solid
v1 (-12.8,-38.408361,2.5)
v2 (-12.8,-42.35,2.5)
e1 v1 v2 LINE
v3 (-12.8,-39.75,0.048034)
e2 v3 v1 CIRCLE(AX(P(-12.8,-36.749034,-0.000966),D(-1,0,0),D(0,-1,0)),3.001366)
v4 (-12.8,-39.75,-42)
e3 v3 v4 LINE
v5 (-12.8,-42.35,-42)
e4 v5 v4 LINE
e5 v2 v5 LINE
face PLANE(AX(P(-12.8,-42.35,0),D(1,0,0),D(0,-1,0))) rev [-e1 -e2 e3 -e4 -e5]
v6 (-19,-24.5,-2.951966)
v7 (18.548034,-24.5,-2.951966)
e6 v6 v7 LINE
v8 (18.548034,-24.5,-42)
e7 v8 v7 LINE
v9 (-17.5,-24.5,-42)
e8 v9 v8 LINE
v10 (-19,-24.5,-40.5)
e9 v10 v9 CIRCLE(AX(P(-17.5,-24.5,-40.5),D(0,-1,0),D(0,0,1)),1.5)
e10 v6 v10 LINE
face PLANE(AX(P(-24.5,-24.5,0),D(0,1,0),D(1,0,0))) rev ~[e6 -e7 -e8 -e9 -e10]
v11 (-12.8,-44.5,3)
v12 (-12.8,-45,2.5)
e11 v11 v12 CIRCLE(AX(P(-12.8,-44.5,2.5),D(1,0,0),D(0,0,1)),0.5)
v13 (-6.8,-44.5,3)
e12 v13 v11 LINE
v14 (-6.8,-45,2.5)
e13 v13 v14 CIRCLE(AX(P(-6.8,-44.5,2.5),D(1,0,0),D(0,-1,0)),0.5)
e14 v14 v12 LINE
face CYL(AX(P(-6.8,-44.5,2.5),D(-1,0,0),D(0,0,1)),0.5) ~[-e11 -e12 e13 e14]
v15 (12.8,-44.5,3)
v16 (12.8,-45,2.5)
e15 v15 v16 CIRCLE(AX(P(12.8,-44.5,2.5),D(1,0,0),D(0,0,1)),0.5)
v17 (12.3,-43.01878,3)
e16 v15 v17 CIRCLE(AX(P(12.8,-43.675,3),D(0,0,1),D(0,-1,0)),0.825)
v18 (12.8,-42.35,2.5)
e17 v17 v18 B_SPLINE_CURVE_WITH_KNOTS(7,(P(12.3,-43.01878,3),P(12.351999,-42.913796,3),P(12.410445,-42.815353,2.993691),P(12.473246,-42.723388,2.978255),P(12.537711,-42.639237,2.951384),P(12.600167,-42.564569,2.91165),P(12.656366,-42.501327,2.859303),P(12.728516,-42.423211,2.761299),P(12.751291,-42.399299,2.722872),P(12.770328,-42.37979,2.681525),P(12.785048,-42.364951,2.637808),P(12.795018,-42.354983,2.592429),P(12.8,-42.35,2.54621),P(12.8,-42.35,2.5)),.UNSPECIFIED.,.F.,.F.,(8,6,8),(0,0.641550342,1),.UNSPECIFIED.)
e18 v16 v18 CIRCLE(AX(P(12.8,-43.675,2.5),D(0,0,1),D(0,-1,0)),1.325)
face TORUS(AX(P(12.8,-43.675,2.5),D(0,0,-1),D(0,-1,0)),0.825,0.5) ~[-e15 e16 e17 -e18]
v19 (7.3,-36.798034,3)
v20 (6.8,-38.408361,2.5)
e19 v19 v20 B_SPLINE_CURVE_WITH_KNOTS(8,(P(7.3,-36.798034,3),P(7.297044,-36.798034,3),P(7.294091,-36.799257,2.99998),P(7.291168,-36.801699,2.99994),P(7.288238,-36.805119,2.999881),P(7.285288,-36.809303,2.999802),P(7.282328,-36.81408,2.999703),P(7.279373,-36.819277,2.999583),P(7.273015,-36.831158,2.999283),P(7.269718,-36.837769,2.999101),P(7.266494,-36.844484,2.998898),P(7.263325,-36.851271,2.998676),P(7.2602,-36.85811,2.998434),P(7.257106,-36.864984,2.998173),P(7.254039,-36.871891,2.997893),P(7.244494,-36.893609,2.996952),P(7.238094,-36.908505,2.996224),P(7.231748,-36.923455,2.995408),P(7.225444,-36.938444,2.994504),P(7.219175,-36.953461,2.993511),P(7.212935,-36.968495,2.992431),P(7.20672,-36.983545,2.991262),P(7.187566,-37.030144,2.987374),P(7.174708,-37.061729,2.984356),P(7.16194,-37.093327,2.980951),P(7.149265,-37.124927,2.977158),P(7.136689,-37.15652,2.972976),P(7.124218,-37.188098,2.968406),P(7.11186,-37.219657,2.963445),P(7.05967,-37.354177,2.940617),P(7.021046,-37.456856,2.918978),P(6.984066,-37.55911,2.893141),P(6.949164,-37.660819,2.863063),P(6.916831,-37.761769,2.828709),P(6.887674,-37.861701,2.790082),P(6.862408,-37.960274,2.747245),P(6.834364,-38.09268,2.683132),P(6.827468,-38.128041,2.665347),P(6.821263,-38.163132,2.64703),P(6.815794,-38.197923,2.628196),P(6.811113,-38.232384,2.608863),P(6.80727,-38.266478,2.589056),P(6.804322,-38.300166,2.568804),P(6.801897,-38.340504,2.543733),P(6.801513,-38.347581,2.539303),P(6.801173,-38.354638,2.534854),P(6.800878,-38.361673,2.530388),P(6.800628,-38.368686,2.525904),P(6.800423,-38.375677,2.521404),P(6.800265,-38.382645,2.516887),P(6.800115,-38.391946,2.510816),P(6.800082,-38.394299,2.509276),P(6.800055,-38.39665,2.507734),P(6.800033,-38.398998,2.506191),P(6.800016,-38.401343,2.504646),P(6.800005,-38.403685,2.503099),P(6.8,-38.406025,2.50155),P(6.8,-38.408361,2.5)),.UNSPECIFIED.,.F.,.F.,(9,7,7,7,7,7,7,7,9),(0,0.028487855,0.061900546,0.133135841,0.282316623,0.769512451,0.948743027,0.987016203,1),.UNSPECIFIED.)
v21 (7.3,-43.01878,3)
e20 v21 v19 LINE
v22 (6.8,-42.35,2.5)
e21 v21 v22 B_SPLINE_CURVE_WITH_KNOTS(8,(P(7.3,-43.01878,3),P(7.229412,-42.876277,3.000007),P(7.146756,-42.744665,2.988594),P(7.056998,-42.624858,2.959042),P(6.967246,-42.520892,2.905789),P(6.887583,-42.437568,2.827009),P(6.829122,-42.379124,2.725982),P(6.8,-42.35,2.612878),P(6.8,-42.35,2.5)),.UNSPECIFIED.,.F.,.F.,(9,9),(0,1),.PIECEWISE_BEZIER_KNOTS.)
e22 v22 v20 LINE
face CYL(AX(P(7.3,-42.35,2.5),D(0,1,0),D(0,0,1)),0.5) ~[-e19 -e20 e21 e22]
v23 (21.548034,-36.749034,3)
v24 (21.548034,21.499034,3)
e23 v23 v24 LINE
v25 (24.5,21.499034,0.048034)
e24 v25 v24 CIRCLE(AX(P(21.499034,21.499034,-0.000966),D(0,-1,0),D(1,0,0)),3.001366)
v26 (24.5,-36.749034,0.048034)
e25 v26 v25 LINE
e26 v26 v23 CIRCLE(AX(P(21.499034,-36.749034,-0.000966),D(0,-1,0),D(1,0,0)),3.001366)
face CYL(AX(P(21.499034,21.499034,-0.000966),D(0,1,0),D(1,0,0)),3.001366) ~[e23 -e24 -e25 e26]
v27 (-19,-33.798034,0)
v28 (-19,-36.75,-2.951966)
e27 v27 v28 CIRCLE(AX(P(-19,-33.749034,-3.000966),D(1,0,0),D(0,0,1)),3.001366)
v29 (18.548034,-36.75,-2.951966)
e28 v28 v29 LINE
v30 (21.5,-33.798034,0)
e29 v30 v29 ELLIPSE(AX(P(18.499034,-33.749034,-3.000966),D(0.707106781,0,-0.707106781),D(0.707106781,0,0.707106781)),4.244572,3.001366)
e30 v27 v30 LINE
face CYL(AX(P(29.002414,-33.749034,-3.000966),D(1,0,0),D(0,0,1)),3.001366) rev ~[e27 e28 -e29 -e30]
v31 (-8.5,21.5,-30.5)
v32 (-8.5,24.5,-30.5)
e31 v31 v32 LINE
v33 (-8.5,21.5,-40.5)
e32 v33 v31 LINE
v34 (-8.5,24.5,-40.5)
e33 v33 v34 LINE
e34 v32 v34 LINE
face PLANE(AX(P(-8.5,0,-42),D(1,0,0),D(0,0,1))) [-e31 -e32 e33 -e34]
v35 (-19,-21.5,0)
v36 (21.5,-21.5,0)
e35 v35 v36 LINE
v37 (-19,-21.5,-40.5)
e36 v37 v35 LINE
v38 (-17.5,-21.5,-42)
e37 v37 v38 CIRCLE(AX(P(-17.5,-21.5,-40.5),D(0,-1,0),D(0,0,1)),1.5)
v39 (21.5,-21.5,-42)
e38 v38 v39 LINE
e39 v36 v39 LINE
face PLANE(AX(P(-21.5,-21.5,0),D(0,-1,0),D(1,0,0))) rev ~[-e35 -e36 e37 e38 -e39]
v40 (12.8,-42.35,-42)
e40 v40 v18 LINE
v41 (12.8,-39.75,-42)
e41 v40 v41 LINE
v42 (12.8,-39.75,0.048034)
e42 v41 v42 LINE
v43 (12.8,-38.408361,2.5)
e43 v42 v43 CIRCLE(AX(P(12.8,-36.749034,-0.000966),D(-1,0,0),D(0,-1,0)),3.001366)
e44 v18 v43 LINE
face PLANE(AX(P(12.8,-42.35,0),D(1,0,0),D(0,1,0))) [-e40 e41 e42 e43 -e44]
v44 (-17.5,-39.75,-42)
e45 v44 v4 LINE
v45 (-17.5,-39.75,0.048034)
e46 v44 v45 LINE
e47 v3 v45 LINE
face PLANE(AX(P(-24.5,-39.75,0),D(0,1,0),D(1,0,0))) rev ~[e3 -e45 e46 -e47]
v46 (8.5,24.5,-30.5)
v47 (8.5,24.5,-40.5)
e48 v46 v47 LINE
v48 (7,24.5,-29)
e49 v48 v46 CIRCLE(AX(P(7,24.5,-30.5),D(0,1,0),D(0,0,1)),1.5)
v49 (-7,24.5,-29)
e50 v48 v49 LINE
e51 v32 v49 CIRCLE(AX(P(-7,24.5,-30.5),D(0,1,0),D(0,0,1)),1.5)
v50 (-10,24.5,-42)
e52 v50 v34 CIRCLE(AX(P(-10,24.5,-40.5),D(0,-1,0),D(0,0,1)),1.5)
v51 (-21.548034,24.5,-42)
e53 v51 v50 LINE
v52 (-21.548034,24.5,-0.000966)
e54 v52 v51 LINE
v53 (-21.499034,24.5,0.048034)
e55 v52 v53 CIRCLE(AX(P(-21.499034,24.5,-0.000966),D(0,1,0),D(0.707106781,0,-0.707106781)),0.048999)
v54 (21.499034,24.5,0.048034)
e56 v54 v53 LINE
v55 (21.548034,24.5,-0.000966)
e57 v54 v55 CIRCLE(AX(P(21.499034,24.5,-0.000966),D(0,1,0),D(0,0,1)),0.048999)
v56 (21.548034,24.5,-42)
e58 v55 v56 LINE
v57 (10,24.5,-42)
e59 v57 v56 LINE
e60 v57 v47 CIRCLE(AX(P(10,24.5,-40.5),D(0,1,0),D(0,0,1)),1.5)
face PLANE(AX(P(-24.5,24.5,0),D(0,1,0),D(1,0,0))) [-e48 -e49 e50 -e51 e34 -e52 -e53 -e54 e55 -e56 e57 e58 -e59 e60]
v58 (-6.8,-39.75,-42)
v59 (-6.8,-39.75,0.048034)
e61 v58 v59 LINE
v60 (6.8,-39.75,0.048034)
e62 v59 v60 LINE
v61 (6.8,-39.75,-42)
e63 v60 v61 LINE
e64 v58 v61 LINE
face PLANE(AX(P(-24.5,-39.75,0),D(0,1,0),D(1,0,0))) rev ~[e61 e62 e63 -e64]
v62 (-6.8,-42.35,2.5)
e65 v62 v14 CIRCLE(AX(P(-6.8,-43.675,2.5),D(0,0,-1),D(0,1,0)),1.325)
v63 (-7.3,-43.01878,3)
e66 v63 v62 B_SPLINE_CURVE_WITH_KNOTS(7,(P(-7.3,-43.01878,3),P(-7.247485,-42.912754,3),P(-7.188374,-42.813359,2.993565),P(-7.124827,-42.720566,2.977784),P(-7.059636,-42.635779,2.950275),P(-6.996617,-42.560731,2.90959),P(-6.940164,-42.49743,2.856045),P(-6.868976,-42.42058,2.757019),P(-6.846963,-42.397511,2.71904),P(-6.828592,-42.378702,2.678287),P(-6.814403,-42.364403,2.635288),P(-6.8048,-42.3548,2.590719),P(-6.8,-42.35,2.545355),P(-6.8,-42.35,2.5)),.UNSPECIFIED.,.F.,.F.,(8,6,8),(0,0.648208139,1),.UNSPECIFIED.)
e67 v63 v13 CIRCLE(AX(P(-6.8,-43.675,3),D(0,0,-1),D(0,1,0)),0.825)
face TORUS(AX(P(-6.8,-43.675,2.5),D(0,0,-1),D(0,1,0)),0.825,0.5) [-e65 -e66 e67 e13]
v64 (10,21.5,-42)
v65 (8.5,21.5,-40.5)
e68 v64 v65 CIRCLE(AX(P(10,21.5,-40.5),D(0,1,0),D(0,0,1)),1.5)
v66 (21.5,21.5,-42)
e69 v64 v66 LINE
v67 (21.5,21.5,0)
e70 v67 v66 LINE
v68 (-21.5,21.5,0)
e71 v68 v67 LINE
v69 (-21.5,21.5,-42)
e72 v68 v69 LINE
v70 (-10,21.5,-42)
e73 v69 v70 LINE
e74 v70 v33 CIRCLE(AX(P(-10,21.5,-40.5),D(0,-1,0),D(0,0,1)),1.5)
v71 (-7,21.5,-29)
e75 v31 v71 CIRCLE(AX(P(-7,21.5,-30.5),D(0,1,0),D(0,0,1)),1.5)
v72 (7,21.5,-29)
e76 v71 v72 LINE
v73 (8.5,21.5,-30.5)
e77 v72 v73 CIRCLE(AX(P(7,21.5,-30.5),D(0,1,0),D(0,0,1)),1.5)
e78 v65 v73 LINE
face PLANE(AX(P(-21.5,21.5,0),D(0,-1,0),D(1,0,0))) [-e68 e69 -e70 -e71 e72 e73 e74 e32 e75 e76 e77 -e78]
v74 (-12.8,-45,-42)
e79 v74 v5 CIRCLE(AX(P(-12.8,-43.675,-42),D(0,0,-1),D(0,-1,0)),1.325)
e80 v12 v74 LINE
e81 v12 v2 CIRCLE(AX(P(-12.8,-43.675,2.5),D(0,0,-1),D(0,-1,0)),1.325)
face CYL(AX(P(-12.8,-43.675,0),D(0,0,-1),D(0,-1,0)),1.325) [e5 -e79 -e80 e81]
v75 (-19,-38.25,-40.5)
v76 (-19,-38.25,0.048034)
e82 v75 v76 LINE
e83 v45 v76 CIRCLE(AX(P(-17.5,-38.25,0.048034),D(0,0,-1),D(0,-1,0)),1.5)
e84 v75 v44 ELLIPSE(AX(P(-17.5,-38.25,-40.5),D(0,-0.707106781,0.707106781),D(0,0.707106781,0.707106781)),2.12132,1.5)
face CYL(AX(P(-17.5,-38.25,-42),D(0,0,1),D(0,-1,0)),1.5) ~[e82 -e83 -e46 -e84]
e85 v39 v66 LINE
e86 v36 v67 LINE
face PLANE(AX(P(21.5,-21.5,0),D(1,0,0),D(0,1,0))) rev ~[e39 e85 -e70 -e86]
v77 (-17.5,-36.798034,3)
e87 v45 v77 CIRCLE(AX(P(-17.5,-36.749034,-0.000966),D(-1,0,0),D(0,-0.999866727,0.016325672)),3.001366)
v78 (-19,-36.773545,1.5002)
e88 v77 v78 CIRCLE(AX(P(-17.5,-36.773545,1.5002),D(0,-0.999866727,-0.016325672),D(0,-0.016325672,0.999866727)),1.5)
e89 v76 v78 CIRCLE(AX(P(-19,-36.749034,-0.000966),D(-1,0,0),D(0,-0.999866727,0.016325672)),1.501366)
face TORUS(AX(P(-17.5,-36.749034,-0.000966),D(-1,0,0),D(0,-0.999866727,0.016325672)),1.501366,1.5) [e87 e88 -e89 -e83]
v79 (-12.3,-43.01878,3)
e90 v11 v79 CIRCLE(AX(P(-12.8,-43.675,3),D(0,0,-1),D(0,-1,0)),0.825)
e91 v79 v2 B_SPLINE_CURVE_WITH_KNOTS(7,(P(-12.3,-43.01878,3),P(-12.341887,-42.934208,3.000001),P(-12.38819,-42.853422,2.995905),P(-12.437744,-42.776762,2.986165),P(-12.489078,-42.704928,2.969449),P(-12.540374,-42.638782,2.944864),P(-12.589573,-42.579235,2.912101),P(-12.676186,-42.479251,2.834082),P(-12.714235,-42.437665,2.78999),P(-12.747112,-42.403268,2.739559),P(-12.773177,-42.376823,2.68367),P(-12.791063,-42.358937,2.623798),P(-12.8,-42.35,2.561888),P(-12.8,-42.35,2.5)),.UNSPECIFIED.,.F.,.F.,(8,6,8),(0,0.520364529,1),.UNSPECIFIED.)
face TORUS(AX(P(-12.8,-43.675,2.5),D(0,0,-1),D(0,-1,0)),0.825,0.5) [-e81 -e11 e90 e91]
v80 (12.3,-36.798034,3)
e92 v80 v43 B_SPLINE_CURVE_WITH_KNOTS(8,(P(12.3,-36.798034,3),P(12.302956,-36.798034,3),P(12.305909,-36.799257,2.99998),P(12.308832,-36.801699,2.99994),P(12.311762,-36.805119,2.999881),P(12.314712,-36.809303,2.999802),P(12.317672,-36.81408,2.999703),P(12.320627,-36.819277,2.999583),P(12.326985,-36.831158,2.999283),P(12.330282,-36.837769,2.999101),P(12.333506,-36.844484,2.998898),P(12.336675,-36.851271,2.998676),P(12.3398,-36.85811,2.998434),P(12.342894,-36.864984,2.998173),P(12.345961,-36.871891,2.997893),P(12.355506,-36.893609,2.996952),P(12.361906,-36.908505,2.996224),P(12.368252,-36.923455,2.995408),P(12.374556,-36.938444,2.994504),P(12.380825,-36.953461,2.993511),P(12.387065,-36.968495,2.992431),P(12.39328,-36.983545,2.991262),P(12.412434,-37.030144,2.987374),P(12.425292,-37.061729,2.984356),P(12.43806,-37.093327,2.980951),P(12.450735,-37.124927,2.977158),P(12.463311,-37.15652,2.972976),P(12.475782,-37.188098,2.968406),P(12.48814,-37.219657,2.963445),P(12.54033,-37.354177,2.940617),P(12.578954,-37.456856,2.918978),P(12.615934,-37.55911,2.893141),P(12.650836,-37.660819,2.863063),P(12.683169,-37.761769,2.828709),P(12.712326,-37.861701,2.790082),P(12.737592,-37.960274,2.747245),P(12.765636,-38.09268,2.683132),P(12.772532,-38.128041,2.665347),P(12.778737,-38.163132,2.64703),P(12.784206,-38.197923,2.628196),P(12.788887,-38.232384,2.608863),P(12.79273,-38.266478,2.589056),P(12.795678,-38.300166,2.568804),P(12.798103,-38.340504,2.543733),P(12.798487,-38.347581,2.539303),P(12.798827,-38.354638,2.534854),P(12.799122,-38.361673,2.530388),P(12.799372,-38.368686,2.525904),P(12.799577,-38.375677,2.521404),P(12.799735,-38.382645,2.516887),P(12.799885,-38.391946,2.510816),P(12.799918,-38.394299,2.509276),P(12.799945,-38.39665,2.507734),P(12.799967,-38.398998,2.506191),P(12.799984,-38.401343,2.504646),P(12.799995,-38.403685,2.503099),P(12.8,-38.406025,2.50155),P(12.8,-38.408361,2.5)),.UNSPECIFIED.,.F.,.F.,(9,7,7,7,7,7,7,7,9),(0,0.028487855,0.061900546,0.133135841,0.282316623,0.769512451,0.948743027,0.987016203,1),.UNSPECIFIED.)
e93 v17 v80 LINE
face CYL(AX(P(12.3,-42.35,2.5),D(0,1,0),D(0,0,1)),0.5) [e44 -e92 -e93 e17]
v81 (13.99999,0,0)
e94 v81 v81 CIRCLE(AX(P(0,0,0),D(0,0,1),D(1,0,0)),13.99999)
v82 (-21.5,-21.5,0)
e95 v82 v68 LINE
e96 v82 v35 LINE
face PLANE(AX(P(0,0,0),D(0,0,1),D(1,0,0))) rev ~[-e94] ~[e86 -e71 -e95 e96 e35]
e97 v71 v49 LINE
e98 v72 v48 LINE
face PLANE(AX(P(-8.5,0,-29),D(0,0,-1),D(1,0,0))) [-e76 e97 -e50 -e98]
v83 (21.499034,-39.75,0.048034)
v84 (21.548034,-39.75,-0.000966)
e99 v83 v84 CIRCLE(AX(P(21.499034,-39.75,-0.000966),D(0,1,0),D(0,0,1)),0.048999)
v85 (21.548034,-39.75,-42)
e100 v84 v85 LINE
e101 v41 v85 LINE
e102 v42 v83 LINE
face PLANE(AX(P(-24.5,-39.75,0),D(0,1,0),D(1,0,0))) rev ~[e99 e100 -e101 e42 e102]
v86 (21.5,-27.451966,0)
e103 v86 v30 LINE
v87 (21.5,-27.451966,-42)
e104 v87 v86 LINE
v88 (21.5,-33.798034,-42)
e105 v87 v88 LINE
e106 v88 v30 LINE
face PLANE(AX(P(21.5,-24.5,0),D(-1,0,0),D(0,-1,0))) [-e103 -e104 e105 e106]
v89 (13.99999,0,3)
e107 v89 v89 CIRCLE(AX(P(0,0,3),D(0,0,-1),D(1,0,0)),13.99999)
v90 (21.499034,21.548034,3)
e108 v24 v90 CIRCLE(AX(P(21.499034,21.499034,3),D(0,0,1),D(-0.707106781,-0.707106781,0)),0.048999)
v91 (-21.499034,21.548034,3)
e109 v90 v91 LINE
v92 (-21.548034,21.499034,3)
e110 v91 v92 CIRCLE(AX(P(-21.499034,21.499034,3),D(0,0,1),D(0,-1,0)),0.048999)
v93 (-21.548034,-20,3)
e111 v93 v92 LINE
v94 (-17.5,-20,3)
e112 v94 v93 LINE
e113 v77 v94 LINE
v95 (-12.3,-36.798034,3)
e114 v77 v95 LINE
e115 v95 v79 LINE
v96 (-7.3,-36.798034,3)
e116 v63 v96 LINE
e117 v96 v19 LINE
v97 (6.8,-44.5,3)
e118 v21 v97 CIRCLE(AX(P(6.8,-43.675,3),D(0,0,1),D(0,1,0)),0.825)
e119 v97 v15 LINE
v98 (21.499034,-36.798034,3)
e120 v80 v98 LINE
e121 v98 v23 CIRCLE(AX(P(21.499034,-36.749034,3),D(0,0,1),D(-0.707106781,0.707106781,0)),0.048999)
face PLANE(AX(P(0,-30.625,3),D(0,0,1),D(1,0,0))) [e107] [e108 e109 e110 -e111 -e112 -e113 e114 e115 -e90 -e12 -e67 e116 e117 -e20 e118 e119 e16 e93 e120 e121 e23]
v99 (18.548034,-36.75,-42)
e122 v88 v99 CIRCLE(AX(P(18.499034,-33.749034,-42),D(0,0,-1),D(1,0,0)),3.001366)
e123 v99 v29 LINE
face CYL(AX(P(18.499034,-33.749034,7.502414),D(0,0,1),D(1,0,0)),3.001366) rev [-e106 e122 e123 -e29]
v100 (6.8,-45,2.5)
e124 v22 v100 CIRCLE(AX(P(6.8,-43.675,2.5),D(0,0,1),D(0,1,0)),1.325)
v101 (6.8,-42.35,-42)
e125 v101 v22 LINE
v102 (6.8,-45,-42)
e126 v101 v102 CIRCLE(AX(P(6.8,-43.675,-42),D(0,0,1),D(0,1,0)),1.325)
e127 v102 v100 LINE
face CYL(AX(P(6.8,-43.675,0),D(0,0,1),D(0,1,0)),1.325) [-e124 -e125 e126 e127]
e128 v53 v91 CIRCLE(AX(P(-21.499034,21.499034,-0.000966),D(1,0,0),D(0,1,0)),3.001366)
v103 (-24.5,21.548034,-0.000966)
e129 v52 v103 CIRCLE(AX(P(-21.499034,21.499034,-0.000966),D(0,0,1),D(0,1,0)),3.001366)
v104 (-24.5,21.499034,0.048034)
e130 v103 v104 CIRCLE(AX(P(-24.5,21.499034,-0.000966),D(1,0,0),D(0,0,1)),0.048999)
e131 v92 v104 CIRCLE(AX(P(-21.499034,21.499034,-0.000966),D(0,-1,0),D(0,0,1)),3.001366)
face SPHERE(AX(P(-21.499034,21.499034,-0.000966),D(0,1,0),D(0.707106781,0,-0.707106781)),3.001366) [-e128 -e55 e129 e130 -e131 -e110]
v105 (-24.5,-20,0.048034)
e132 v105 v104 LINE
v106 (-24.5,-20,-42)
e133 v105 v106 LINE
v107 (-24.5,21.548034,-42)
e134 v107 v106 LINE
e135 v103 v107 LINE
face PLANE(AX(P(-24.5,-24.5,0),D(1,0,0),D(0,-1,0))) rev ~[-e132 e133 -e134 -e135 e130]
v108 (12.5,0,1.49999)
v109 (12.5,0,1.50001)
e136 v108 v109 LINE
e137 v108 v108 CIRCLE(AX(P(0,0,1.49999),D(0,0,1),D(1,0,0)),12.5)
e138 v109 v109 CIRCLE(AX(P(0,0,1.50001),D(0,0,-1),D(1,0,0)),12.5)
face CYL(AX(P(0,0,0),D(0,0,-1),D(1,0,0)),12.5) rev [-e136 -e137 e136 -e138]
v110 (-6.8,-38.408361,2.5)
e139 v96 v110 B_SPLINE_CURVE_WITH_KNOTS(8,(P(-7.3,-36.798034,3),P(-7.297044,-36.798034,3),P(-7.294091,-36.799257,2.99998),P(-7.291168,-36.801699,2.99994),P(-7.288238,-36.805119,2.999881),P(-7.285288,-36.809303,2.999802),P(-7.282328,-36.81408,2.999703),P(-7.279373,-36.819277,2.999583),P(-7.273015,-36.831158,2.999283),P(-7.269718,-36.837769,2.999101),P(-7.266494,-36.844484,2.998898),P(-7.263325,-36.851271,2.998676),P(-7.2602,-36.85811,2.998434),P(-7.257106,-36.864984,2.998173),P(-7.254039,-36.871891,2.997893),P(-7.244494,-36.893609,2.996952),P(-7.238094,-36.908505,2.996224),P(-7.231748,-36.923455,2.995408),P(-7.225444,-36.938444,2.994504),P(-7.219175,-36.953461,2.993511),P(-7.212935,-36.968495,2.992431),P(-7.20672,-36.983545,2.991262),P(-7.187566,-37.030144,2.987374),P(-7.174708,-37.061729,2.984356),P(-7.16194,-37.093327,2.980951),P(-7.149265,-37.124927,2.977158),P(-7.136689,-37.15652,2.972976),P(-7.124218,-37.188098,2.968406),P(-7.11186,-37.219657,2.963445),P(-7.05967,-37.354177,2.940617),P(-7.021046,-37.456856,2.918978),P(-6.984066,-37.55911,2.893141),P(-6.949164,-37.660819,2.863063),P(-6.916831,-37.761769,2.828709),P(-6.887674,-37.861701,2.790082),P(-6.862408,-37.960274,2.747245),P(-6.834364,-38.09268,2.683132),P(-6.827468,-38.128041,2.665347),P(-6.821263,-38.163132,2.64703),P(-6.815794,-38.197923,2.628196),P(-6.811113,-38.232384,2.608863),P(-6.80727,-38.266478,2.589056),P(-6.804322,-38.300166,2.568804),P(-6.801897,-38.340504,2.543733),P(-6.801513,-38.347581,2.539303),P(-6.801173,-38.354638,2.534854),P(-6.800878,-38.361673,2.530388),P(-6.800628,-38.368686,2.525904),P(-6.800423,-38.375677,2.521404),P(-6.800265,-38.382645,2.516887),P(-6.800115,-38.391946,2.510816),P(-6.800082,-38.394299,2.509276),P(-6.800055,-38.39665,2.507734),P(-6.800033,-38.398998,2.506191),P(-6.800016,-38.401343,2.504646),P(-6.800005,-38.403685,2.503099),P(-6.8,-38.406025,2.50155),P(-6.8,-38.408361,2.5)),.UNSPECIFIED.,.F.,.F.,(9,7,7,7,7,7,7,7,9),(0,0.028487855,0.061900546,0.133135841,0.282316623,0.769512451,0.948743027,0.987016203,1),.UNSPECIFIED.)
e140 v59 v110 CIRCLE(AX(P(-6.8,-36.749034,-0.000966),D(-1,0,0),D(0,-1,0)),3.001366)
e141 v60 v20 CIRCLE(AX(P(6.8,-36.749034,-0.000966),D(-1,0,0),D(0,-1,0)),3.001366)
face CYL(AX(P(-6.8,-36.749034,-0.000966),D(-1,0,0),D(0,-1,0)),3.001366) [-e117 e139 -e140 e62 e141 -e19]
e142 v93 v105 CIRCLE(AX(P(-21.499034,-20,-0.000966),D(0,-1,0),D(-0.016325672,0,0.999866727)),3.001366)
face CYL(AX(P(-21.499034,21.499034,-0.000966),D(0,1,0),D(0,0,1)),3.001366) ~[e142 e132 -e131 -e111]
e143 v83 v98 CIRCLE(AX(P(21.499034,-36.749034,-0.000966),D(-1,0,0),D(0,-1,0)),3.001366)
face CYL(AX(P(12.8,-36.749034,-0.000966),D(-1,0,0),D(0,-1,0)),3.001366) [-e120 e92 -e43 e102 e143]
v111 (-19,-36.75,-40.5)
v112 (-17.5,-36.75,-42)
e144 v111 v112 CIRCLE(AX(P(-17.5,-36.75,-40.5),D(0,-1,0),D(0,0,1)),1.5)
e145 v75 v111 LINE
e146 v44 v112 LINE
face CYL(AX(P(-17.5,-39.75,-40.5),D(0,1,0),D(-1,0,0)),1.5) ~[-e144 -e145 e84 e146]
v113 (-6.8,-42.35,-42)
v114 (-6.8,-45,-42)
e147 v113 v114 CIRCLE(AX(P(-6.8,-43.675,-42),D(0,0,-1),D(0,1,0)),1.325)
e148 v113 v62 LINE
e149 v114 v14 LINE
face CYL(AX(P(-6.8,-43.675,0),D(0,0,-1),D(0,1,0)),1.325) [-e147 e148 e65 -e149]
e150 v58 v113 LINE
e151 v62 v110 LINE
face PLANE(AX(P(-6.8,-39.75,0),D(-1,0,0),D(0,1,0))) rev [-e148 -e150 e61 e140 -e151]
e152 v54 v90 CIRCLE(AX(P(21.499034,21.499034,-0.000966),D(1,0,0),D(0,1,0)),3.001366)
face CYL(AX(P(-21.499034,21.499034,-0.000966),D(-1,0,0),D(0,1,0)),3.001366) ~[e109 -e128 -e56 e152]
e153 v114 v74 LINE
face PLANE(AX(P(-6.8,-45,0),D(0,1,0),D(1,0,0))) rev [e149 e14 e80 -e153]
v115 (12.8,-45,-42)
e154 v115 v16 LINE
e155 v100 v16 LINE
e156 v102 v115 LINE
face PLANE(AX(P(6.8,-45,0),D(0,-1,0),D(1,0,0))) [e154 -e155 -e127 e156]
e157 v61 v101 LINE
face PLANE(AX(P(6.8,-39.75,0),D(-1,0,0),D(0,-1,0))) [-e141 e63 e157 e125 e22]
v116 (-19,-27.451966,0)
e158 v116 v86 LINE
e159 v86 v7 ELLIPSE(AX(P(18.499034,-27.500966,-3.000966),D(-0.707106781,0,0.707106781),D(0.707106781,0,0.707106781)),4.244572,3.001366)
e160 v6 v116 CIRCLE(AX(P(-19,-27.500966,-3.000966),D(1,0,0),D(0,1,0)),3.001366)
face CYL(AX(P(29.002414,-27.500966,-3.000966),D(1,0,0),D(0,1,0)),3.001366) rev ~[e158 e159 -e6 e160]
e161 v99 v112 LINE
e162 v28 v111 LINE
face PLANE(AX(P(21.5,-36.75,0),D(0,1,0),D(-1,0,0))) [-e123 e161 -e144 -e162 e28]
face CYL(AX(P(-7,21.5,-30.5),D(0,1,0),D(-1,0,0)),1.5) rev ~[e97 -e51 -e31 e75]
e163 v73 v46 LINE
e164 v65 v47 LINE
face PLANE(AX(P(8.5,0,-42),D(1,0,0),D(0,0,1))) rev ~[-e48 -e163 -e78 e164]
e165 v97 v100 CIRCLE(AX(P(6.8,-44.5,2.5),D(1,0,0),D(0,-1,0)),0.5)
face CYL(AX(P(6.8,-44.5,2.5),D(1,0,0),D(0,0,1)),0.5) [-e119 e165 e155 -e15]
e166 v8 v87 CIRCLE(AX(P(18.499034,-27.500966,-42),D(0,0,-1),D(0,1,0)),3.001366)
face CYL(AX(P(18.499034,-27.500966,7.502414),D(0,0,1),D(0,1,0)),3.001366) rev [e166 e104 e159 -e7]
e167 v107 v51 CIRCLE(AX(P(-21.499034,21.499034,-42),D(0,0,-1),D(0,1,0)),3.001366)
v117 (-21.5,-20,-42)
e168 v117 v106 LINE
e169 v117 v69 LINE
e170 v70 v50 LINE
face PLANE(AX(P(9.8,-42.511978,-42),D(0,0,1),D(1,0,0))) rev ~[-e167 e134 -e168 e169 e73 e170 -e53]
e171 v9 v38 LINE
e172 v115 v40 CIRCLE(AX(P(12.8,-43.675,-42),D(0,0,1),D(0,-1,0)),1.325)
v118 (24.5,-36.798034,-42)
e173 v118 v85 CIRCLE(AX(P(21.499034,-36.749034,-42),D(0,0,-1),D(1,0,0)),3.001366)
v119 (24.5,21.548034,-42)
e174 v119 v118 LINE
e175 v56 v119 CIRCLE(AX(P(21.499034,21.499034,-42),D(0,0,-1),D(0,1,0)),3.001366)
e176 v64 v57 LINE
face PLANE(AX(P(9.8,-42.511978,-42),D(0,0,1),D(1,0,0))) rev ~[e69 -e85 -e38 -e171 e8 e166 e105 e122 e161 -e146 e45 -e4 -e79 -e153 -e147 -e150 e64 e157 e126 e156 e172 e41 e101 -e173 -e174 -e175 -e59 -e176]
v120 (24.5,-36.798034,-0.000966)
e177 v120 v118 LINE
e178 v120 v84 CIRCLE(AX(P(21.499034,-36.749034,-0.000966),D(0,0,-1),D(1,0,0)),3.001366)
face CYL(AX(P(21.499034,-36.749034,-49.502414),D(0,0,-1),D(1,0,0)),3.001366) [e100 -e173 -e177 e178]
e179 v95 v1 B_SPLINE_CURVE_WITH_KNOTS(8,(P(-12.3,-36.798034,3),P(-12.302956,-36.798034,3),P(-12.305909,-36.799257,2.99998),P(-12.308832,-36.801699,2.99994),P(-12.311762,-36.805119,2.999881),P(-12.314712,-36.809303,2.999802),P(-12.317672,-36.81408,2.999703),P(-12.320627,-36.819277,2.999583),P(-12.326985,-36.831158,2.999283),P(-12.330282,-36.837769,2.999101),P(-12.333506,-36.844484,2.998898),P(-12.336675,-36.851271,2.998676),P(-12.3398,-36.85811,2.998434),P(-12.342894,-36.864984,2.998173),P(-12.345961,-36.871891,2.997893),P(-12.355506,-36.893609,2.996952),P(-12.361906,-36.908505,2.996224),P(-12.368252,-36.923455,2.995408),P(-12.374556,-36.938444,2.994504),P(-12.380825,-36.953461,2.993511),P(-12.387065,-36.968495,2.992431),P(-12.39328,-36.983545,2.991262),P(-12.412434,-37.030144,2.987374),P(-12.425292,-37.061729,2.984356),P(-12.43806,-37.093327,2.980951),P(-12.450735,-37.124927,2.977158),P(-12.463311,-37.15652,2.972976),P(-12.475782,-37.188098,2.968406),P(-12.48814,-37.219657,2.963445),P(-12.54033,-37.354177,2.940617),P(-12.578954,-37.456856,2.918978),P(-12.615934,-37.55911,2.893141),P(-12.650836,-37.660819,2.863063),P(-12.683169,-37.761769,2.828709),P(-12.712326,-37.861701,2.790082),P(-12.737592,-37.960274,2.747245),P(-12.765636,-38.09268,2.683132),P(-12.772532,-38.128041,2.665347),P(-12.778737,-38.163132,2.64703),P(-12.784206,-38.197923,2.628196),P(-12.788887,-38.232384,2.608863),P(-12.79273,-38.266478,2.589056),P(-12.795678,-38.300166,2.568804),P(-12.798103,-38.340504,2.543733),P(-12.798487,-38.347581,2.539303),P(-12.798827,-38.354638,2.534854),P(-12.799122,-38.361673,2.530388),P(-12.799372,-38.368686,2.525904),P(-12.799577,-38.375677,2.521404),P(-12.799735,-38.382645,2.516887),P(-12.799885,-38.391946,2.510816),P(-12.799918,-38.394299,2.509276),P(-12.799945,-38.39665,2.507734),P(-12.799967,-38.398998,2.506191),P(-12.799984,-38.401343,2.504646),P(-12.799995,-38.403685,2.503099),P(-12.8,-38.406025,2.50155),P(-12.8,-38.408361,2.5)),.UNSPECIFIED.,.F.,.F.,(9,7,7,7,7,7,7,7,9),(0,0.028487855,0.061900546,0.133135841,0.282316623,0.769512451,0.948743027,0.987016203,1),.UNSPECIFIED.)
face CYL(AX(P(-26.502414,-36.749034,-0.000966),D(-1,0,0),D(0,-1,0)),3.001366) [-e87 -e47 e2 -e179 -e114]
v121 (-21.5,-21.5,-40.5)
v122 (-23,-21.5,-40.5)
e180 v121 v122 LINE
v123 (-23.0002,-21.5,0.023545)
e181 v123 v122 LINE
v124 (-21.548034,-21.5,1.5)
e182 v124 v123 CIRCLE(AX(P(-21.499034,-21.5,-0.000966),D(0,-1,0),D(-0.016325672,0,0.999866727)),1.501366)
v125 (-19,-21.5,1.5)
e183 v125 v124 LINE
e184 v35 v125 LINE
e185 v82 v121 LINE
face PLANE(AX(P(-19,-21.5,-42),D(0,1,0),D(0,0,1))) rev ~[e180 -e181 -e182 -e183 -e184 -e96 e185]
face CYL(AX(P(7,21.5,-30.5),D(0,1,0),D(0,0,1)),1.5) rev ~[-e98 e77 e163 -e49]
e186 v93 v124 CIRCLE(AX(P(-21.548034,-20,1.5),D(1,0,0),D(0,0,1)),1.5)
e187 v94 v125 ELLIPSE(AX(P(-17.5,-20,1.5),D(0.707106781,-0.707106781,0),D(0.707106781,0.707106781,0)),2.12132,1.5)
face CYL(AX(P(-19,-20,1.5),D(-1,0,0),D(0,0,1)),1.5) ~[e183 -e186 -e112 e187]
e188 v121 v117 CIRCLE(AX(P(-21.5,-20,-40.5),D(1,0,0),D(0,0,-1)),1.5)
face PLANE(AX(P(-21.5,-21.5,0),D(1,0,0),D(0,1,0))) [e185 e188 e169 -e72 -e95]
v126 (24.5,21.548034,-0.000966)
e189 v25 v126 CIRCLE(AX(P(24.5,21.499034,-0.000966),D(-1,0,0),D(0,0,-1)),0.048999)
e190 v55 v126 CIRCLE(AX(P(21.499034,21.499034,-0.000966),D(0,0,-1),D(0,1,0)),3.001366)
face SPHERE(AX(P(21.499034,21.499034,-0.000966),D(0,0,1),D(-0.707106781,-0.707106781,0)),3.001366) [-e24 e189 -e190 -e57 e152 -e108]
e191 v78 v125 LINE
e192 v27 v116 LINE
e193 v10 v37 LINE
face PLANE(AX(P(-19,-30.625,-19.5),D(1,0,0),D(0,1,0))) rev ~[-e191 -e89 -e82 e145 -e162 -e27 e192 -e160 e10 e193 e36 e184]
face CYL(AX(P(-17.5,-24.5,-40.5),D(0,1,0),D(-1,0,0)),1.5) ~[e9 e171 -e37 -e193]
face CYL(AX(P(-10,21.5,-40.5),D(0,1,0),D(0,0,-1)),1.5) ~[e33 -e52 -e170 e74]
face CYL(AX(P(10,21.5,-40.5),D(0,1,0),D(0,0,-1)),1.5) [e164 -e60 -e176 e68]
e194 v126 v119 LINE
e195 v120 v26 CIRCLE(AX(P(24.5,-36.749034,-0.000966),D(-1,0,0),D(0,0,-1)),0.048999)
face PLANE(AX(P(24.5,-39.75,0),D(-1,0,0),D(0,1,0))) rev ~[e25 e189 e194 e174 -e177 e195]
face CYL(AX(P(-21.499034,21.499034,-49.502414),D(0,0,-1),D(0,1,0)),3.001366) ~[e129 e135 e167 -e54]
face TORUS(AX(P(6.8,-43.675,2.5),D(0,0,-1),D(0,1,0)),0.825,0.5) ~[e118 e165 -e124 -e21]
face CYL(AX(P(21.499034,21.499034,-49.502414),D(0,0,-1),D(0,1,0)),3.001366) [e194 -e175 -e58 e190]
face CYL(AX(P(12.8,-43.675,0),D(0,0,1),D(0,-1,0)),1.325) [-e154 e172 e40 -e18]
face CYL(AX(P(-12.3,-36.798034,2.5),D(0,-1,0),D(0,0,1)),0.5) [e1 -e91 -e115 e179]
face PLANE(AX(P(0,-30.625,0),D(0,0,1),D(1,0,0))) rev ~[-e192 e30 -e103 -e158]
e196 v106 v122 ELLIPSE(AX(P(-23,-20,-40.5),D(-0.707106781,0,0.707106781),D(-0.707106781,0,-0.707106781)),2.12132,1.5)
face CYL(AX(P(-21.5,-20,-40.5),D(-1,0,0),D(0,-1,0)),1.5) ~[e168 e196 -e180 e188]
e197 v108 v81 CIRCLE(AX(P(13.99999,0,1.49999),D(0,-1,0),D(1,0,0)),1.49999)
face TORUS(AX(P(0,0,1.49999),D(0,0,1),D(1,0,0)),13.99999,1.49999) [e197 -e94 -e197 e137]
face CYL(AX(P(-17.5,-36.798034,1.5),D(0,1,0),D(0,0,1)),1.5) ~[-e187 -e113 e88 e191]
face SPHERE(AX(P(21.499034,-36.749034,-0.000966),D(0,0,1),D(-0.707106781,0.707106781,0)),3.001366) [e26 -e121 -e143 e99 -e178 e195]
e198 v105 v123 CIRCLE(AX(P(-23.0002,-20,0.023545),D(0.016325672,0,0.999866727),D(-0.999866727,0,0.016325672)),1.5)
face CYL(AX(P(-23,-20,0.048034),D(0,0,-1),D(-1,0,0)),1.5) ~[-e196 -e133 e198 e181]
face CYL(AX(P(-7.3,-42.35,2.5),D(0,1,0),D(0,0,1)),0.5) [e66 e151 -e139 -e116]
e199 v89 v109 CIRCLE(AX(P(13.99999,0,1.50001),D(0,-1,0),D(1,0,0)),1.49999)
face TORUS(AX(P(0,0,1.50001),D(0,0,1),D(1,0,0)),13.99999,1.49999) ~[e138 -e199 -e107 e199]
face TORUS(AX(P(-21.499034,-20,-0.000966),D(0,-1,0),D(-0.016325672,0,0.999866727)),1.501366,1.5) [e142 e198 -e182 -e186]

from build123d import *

# Parameters (mm, degrees)
F0_W           = 49
F0_H           = 49
F0_W_2         = 43
F0_H_2         = 43
F1_DEPTH       = 42
F2_DEPTH       = 3
F3_R           = 12.5
F4_DEPTH       = 3.001
F5_W           = 17
F5_H           = 13
F6_DEPTH       = 24.501
F8_DEPTH       = 42
F7_W           = 43
F7_H           = 12.25
F9_DEPTH       = 3
F11_DEPTH      = 3
F11_DEPTH_BACK = 42
F13_W          = 18.25
F13_H          = 45
F14_DEPTH      = 5.5
F15_T4_DEPTH   = 49.5024142802
F15_T9_DEPTH   = 48.0024142802
F15_T14_DEPTH  = 48.0024142802
F15_T19_DEPTH  = 49.5024142802
F15_T21_DEPTH  = 49.5014485948
F15_T23_DEPTH  = 50.5014485948
F15_T25_DEPTH  = 58.2480686292
F15_T27_DEPTH  = 42.9980686292
F15_T29_DEPTH  = 8.6990343146
F15_T31_DEPTH  = 13.7024142802
F15_T33_DEPTH  = 13.6
F15_S37_W      = 3.3015022539
F15_S37_H      = 3.3015022539
F15_T38_DEPTH  = 3.301502254
F15_S43_W      = 3.3015022539
F15_S43_H      = 3.3015022539
F15_T44_DEPTH  = 3.301502254
F15_S49_W      = 3.3015022539
F15_S49_H      = 3.3015022539
F15_T50_DEPTH  = 3.301502254
F15_T56_DEPTH  = 16.2014485948
F15_T61_DEPTH  = 21.2048285604
F15_T66_DEPTH  = 28.6048285604
F15_T71_DEPTH  = 28.6048285604
F16_R          = 1.49999
F17_R          = 1.5
F18_R          = 0.5


# Not quite as in the source:
# - a fillet or chamfer that OpenCascade refuses, or shapes differently, is made with other operations: its cross-section is extruded or revolved along the edge and cut away or added
# - a fillet or chamfer is up to 0.001 mm smaller than in the source, because OpenCascade refuses the exact size
# - a pattern or mirror of a feature is missing from the dataset's text; its kind, count and spacing are read off the source's solid


with BuildPart() as f1:
    # F0 (on Top) → F1 (new body)
    with BuildSketch(Plane.XY):
        Rectangle(F0_W, F0_H)
        Rectangle(F0_W_2, F0_H_2, mode=Mode.SUBTRACT)
    extrude(amount=-F1_DEPTH)

    # F0 (on Top) → F2 (join)
    with BuildSketch(Plane.XY):
        Rectangle(F0_W, F0_H)
        Rectangle(F0_W_2, F0_H_2, mode=Mode.SUBTRACT)
        Rectangle(F0_W_2, F0_H_2)
    extrude(amount=F2_DEPTH)

    # F3 (on Top) → F4 (cut, through all)
    with BuildSketch(Plane.XY):
        Circle(F3_R)
    extrude(amount=F4_DEPTH, mode=Mode.SUBTRACT)

    # F5 (on Front) → F6 (cut, through all)
    with BuildSketch(Plane.XZ):
        with Locations((0, -35.5)):
            Rectangle(F5_W, F5_H)
    extrude(amount=-F6_DEPTH, mode=Mode.SUBTRACT)

    # F7 (on Top) → F8 (join, through all)
    with BuildSketch(Plane.XY):
        Polygon((-21.5, -24.5), (-24.5, -24.5), (-24.5, -39.75), (24.5, -39.75), (24.5, -24.5), (21.5, -24.5), (21.5, -36.75), (-21.5, -36.75), align=None)
    extrude(amount=-F8_DEPTH)

    # F7 (on Top) → F9 (join, through all)
    with BuildSketch(Plane.XY):
        with Locations((0, -30.625)):
            Rectangle(F7_W, F7_H)
        Polygon((-21.5, -24.5), (-24.5, -24.5), (-24.5, -39.75), (24.5, -39.75), (24.5, -24.5), (21.5, -24.5), (21.5, -36.75), (-21.5, -36.75), align=None)
    extrude(amount=F9_DEPTH)

    # F10 (on Top) → F11 (join, two sides)
    with BuildSketch(Plane.XY) as f11_sk:
        with BuildLine():
            Line((12.8, -39.75), (6.8, -39.75))
            Line((6.8, -39.75), (6.8, -42.35))
            ThreePointArc((6.8, -42.35), (5.475, -43.675), (6.8, -45))
            Line((6.8, -45), (12.8, -45))
            ThreePointArc((12.8, -45), (14.125, -43.675), (12.8, -42.35))
            Line((12.8, -42.35), (12.8, -39.75))
        make_face()
    f11 = extrude(amount=F11_DEPTH) + extrude(f11_sk.sketch, amount=-F11_DEPTH_BACK)

    # F11_copies: F11 across plane
    add(f11.mirror(Plane(origin=(0, 0, 0), x_dir=(0, 0, -1), z_dir=(-1, 0, 0))))

    # F13 (on offset) → F14 (cut, through all)
    with BuildSketch(Plane.YZ.offset(-19)):
        with Locations((-30.625, -19.5)):
            Rectangle(F13_W, F13_H)
    extrude(amount=-F14_DEPTH, mode=Mode.SUBTRACT)

    # F15: fillet of radius 3 on 13 edges, made by hand


with BuildPart() as f15_tool2:
    # F15_s3 → F15_t4 (new body)
    with BuildSketch(Plane.XY.offset(7.5024142802)):
        with BuildLine():
            ThreePointArc((18.4990343146, -24.4996), (20.6213203436, -25.3786796564), (21.5004, -27.5009656854))
            Line((21.5004, -27.5009656854), (21.8005365685, -27.5009656854))
            ThreePointArc((21.8005365685, -27.5009656854), (21.8001365685, -26.0004828427), (21.8001365685, -24.5))
            Line((21.8001365685, -24.5), (21.5, -24.1998634315))
            ThreePointArc((21.5, -24.1998634315), (19.9995171573, -24.1998634315), (18.4990343146, -24.1994634315))
            Line((18.4990343146, -24.1994634315), (18.4990343146, -24.4996))
        make_face()
    extrude(amount=-F15_T4_DEPTH)

    split(bisect_by=Plane.XY.offset(3), keep=Keep.BOTTOM)


with BuildPart() as f1_1:
    add(f1.part)

    # F15_t1: union F15_tool2
    add(f15_tool2.part)


with BuildPart() as f15_tool7:
    # F15_s8 → F15_t9 (new body)
    with BuildSketch(Plane.YZ.offset(29.0024142802)):
        with BuildLine():
            ThreePointArc((-24.4996, -3.0009656854), (-25.3786796564, -0.8786796564), (-27.5009656854, 0.0004))
            Line((-27.5009656854, 0.0004), (-27.5009656854, 0.3005365685))
            ThreePointArc((-27.5009656854, 0.3005365685), (-26.0004828427, 0.3001365685), (-24.5, 0.3001365685))
            Line((-24.5, 0.3001365685), (-24.1998634315, 0))
            ThreePointArc((-24.1998634315, 0), (-24.1998634315, -1.5004828427), (-24.1994634315, -3.0009656854))
            Line((-24.1994634315, -3.0009656854), (-24.4996, -3.0009656854))
        make_face()
    extrude(amount=-F15_T9_DEPTH)

    split(bisect_by=Plane.YZ.offset(24.5), keep=Keep.BOTTOM)


with BuildPart() as f1_2:
    add(f1_1.part)

    # F15_t6: union F15_tool7
    add(f15_tool7.part)


with BuildPart() as f15_tool12:
    # F15_s13 → F15_t14 (new body)
    with BuildSketch(Plane.YZ.offset(29.0024142802)):
        with BuildLine():
            ThreePointArc((-33.7490343146, 0.0004), (-35.8713203436, -0.8786796564), (-36.7504, -3.0009656854))
            Line((-36.7504, -3.0009656854), (-37.0505365685, -3.0009656854))
            ThreePointArc((-37.0505365685, -3.0009656854), (-37.0501365685, -1.5004828427), (-37.0501365685, 0))
            Line((-37.0501365685, 0), (-36.75, 0.3001365685))
            ThreePointArc((-36.75, 0.3001365685), (-35.2495171573, 0.3001365685), (-33.7490343146, 0.3005365685))
            Line((-33.7490343146, 0.3005365685), (-33.7490343146, 0.0004))
        make_face()
    extrude(amount=-F15_T14_DEPTH)

    split(bisect_by=Plane.YZ.offset(24.5), keep=Keep.BOTTOM)


with BuildPart() as f1_3:
    add(f1_2.part)

    # F15_t11: union F15_tool12
    add(f15_tool12.part)


with BuildPart() as f15_tool17:
    # F15_s18 → F15_t19 (new body)
    with BuildSketch(Plane.XY.offset(7.5024142802)):
        with BuildLine():
            ThreePointArc((21.5004, -33.7490343146), (20.6213203436, -35.8713203436), (18.4990343146, -36.7504))
            Line((18.4990343146, -36.7504), (18.4990343146, -37.0505365685))
            ThreePointArc((18.4990343146, -37.0505365685), (19.9995171573, -37.0501365685), (21.5, -37.0501365685))
            Line((21.5, -37.0501365685), (21.8001365685, -36.75))
            ThreePointArc((21.8001365685, -36.75), (21.8001365685, -35.2495171573), (21.8005365685, -33.7490343146))
            Line((21.8005365685, -33.7490343146), (21.5004, -33.7490343146))
        make_face()
    extrude(amount=-F15_T19_DEPTH)

    split(bisect_by=Plane.XY.offset(3), keep=Keep.BOTTOM)


with BuildPart() as f1_4:
    add(f1_3.part)

    # F15_t16: union F15_tool17
    add(f15_tool17.part)

    # F15_s22 → F15_t21 (cut)
    with BuildSketch(Plane.XY.offset(-49.5024142802)):
        with BuildLine():
            ThreePointArc((21.4990343146, 24.5004), (23.6213203436, 23.6213203436), (24.5004, 21.4990343146))
            Line((24.5004, 21.4990343146), (24.8005365685, 21.4990343146))
            ThreePointArc((24.8005365685, 21.4990343146), (24.8001365685, 22.9995171573), (24.8001365685, 24.5))
            Line((24.8001365685, 24.5), (24.5, 24.8001365685))
            ThreePointArc((24.5, 24.8001365685), (22.9995171573, 24.8001365685), (21.4990343146, 24.8005365685))
            Line((21.4990343146, 24.8005365685), (21.4990343146, 24.5004))
        make_face()
        with BuildLine():
            ThreePointArc((-21.4990343146, 24.5004), (-23.6213203436, 23.6213203436), (-24.5004, 21.4990343146))
            Line((-24.5004, 21.4990343146), (-24.8005365685, 21.4990343146))
            ThreePointArc((-24.8005365685, 21.4990343146), (-24.8001365685, 22.9995171573), (-24.8001365685, 24.5))
            Line((-24.8001365685, 24.5), (-24.5, 24.8001365685))
            ThreePointArc((-24.5, 24.8001365685), (-22.9995171573, 24.8001365685), (-21.4990343146, 24.8005365685))
            Line((-21.4990343146, 24.8005365685), (-21.4990343146, 24.5004))
        make_face()
        with BuildLine():
            ThreePointArc((24.5004, -36.7490343146), (23.6213203436, -38.8713203436), (21.4990343146, -39.7504))
            Line((21.4990343146, -39.7504), (21.4990343146, -40.0505365685))
            ThreePointArc((21.4990343146, -40.0505365685), (22.9995171573, -40.0501365685), (24.5, -40.0501365685))
            Line((24.5, -40.0501365685), (24.8001365685, -39.75))
            ThreePointArc((24.8001365685, -39.75), (24.8001365685, -38.2495171573), (24.8005365685, -36.7490343146))
            Line((24.8005365685, -36.7490343146), (24.5004, -36.7490343146))
        make_face()
    extrude(amount=F15_T21_DEPTH, mode=Mode.SUBTRACT)

    # F15_s24 → F15_t23 (cut)
    with BuildSketch(Plane.XZ.offset(-21.4990343146)):
        with BuildLine():
            ThreePointArc((-21.4990343146, 3.0004), (-23.6213203436, 2.1213203436), (-24.5004, -0.0009656854))
            Line((-24.5004, -0.0009656854), (-24.8005365685, -0.0009656854))
            ThreePointArc((-24.8005365685, -0.0009656854), (-24.8001365685, 1.4995171573), (-24.8001365685, 3))
            Line((-24.8001365685, 3), (-24.5, 3.3001365685))
            ThreePointArc((-24.5, 3.3001365685), (-22.9995171573, 3.3001365685), (-21.4990343146, 3.3005365685))
            Line((-21.4990343146, 3.3005365685), (-21.4990343146, 3.0004))
        make_face()
    extrude(amount=F15_T23_DEPTH, mode=Mode.SUBTRACT)

    # F15_s26 → F15_t25 (cut)
    with BuildSketch(Plane.XZ.offset(-21.4990343146)):
        with BuildLine():
            ThreePointArc((24.5004, -0.0009656854), (23.6213203436, 2.1213203436), (21.4990343146, 3.0004))
            Line((21.4990343146, 3.0004), (21.4990343146, 3.3005365685))
            ThreePointArc((21.4990343146, 3.3005365685), (22.9995171573, 3.3001365685), (24.5, 3.3001365685))
            Line((24.5, 3.3001365685), (24.8001365685, 3))
            ThreePointArc((24.8001365685, 3), (24.8001365685, 1.4995171573), (24.8005365685, -0.0009656854))
            Line((24.8005365685, -0.0009656854), (24.5004, -0.0009656854))
        make_face()
    extrude(amount=F15_T25_DEPTH, mode=Mode.SUBTRACT)

    # F15_s28 → F15_t27 (cut)
    with BuildSketch(Plane.YZ.offset(-21.4990343146)):
        with BuildLine():
            ThreePointArc((24.5004, -0.0009656854), (23.6213203436, 2.1213203436), (21.4990343146, 3.0004))
            Line((21.4990343146, 3.0004), (21.4990343146, 3.3005365685))
            ThreePointArc((21.4990343146, 3.3005365685), (22.9995171573, 3.3001365685), (24.5, 3.3001365685))
            Line((24.5, 3.3001365685), (24.8001365685, 3))
            ThreePointArc((24.8001365685, 3), (24.8001365685, 1.4995171573), (24.8005365685, -0.0009656854))
            Line((24.8005365685, -0.0009656854), (24.5004, -0.0009656854))
        make_face()
    extrude(amount=F15_T27_DEPTH, mode=Mode.SUBTRACT)

    # F15_s30 → F15_t29 (cut)
    with BuildSketch(Plane.YZ.offset(12.8)):
        with BuildLine():
            ThreePointArc((-39.7504, -0.0009656854), (-38.8713203436, 2.1213203436), (-36.7490343146, 3.0004))
            Line((-36.7490343146, 3.0004), (-36.7490343146, 3.3005365685))
            ThreePointArc((-36.7490343146, 3.3005365685), (-38.2495171573, 3.3001365685), (-39.75, 3.3001365685))
            Line((-39.75, 3.3001365685), (-40.0501365685, 3))
            ThreePointArc((-40.0501365685, 3), (-40.0501365685, 1.4995171573), (-40.0505365685, -0.0009656854))
            Line((-40.0505365685, -0.0009656854), (-39.7504, -0.0009656854))
        make_face()
    extrude(amount=F15_T29_DEPTH, mode=Mode.SUBTRACT)

    # F15_s32 → F15_t31 (cut)
    with BuildSketch(Plane.YZ.offset(-26.5024142802)):
        with BuildLine():
            ThreePointArc((-39.7504, -0.0009656854), (-38.8713203436, 2.1213203436), (-36.7490343146, 3.0004))
            Line((-36.7490343146, 3.0004), (-36.7490343146, 3.3005365685))
            ThreePointArc((-36.7490343146, 3.3005365685), (-38.2495171573, 3.3001365685), (-39.75, 3.3001365685))
            Line((-39.75, 3.3001365685), (-40.0501365685, 3))
            ThreePointArc((-40.0501365685, 3), (-40.0501365685, 1.4995171573), (-40.0505365685, -0.0009656854))
            Line((-40.0505365685, -0.0009656854), (-39.7504, -0.0009656854))
        make_face()
    extrude(amount=F15_T31_DEPTH, mode=Mode.SUBTRACT)

    # F15_s34 → F15_t33 (cut)
    with BuildSketch(Plane.YZ.offset(-6.8)):
        with BuildLine():
            ThreePointArc((-39.7504, -0.0009656854), (-38.8713203436, 2.1213203436), (-36.7490343146, 3.0004))
            Line((-36.7490343146, 3.0004), (-36.7490343146, 3.3005365685))
            ThreePointArc((-36.7490343146, 3.3005365685), (-38.2495171573, 3.3001365685), (-39.75, 3.3001365685))
            Line((-39.75, 3.3001365685), (-40.0501365685, 3))
            ThreePointArc((-40.0501365685, 3), (-40.0501365685, 1.4995171573), (-40.0505365685, -0.0009656854))
            Line((-40.0505365685, -0.0009656854), (-39.7504, -0.0009656854))
        make_face()
    extrude(amount=F15_T33_DEPTH, mode=Mode.SUBTRACT)


with BuildPart() as f15_tool36:
    # F15_s37 → F15_t38 (new body)
    with BuildSketch(Plane.XY.offset(-0.0009656854)):
        with Locations((23.1497854416, 23.1497854416)):
            Rectangle(F15_S37_W, F15_S37_H)
    extrude(amount=F15_T38_DEPTH)

    # F15_s39 → F15_t40 (revolve, cut)
    with BuildSketch(Plane(origin=(21.4990343146, 21.4990343146, -0.0009656854), x_dir=(-0.7071067812, -0.7071067812, 0), z_dir=(-0.7071067812, 0.7071067812, 0))):
        with BuildLine():
            ThreePointArc((0, -3.0013656854), (3.0013656854, 0), (0, 3.0013656854))
            Line((0, 3.0013656854), (0, -3.0013656854))
        make_face()
    revolve(axis=Axis((21.4990343146, 21.4990343146, -0.0009656854), (0, 0, 1)), mode=Mode.SUBTRACT)


with BuildPart() as f1_5:
    add(f1_4.part)

    # F15_t35: cut F15_tool36
    add(f15_tool36.part, mode=Mode.SUBTRACT)


with BuildPart() as f15_tool42:
    # F15_s43 → F15_t44 (new body)
    with BuildSketch(Plane.XZ.offset(-21.4990343146)):
        with Locations((-23.1497854416, 1.6497854415)):
            Rectangle(F15_S43_W, F15_S43_H)
    extrude(amount=-F15_T44_DEPTH)

    # F15_s45 → F15_t46 (revolve, cut)
    with BuildSketch(Plane(origin=(-21.4990343146, 21.4990343146, -0.0009656854), x_dir=(0.7071067812, 0, -0.7071067812), z_dir=(0.7071067812, 0, 0.7071067812))):
        with BuildLine():
            ThreePointArc((0, -3.0013656854), (3.0013656854, 0), (0, 3.0013656854))
            Line((0, 3.0013656854), (0, -3.0013656854))
        make_face()
    revolve(axis=Axis((-21.4990343146, 21.4990343146, -0.0009656854), (0, 1, 0)), mode=Mode.SUBTRACT)


with BuildPart() as f1_6:
    add(f1_5.part)

    # F15_t41: cut F15_tool42
    add(f15_tool42.part, mode=Mode.SUBTRACT)


with BuildPart() as f15_tool48:
    # F15_s49 → F15_t50 (new body)
    with BuildSketch(Plane.XY.offset(-0.0009656854)):
        with Locations((23.1497854416, -38.3997854416)):
            Rectangle(F15_S49_W, F15_S49_H)
    extrude(amount=F15_T50_DEPTH)

    # F15_s51 → F15_t52 (revolve, cut)
    with BuildSketch(Plane(origin=(21.4990343146, -36.7490343146, -0.0009656854), x_dir=(-0.7071067812, 0.7071067812, 0), z_dir=(0.7071067812, 0.7071067812, 0))):
        with BuildLine():
            ThreePointArc((0, -3.0013656854), (3.0013656854, 0), (0, 3.0013656854))
            Line((0, 3.0013656854), (0, -3.0013656854))
        make_face()
    revolve(axis=Axis((21.4990343146, -36.7490343146, -0.0009656854), (0, 0, 1)), mode=Mode.SUBTRACT)


with BuildPart() as f1_7:
    add(f1_6.part)

    # F15_t47: cut F15_tool48
    add(f15_tool48.part, mode=Mode.SUBTRACT)


with BuildPart() as f15_tool54:
    # F15_s55 → F15_t56 (new body)
    with BuildSketch(Plane.YZ.offset(5.2975857198)):
        with BuildLine():
            ThreePointArc((-39.7504, -0.0009656854), (-38.8713203436, 2.1213203436), (-36.7490343146, 3.0004))
            Line((-36.7490343146, 3.0004), (-36.7490343146, 3.3005365685))
            ThreePointArc((-36.7490343146, 3.3005365685), (-38.2495171573, 3.3001365685), (-39.75, 3.3001365685))
            Line((-39.75, 3.3001365685), (-40.0501365685, 3))
            ThreePointArc((-40.0501365685, 3), (-40.0501365685, 1.4995171573), (-40.0505365685, -0.0009656854))
            Line((-40.0505365685, -0.0009656854), (-39.7504, -0.0009656854))
        make_face()
    extrude(amount=F15_T56_DEPTH)

    split(bisect_by=Plane.YZ.offset(6.8), keep=Keep.BOTTOM)


with BuildPart() as f1_8:
    add(f1_7.part)

    # F15_t53: cut F15_tool54
    add(f15_tool54.part, mode=Mode.SUBTRACT)


with BuildPart() as f15_tool59:
    # F15_s60 → F15_t61 (new body)
    with BuildSketch(Plane.YZ.offset(-26.5024142802)):
        with BuildLine():
            ThreePointArc((-39.7504, -0.0009656854), (-38.8713203436, 2.1213203436), (-36.7490343146, 3.0004))
            Line((-36.7490343146, 3.0004), (-36.7490343146, 3.3005365685))
            ThreePointArc((-36.7490343146, 3.3005365685), (-38.2495171573, 3.3001365685), (-39.75, 3.3001365685))
            Line((-39.75, 3.3001365685), (-40.0501365685, 3))
            ThreePointArc((-40.0501365685, 3), (-40.0501365685, 1.4995171573), (-40.0505365685, -0.0009656854))
            Line((-40.0505365685, -0.0009656854), (-39.7504, -0.0009656854))
        make_face()
    extrude(amount=F15_T61_DEPTH)

    split(bisect_by=Plane.YZ.offset(-6.8), keep=Keep.TOP)


with BuildPart() as f1_9:
    add(f1_8.part)

    # F15_t58: cut F15_tool59
    add(f15_tool59.part, mode=Mode.SUBTRACT)


with BuildPart() as f15_tool64:
    # F15_s65 → F15_t66 (new body)
    with BuildSketch(Plane.YZ.offset(-14.3024142802)):
        with BuildLine():
            ThreePointArc((-39.7504, -0.0009656854), (-38.8713203436, 2.1213203436), (-36.7490343146, 3.0004))
            Line((-36.7490343146, 3.0004), (-36.7490343146, 3.3005365685))
            ThreePointArc((-36.7490343146, 3.3005365685), (-38.2495171573, 3.3001365685), (-39.75, 3.3001365685))
            Line((-39.75, 3.3001365685), (-40.0501365685, 3))
            ThreePointArc((-40.0501365685, 3), (-40.0501365685, 1.4995171573), (-40.0505365685, -0.0009656854))
            Line((-40.0505365685, -0.0009656854), (-39.7504, -0.0009656854))
        make_face()
    extrude(amount=F15_T66_DEPTH)

    split(bisect_by=Plane.YZ.offset(-12.8), keep=Keep.BOTTOM)


with BuildPart() as f1_10:
    add(f1_9.part)

    # F15_t63: cut F15_tool64
    add(f15_tool64.part, mode=Mode.SUBTRACT)


with BuildPart() as f15_tool69:
    # F15_s70 → F15_t71 (new body)
    with BuildSketch(Plane.YZ.offset(-14.3024142802)):
        with BuildLine():
            ThreePointArc((-39.7504, -0.0009656854), (-38.8713203436, 2.1213203436), (-36.7490343146, 3.0004))
            Line((-36.7490343146, 3.0004), (-36.7490343146, 3.3005365685))
            ThreePointArc((-36.7490343146, 3.3005365685), (-38.2495171573, 3.3001365685), (-39.75, 3.3001365685))
            Line((-39.75, 3.3001365685), (-40.0501365685, 3))
            ThreePointArc((-40.0501365685, 3), (-40.0501365685, 1.4995171573), (-40.0505365685, -0.0009656854))
            Line((-40.0505365685, -0.0009656854), (-39.7504, -0.0009656854))
        make_face()
    extrude(amount=F15_T71_DEPTH)

    split(bisect_by=Plane.YZ.offset(12.8), keep=Keep.TOP)


with BuildPart() as f1_11:
    add(f1_10.part)

    # F15_t68: cut F15_tool69
    add(f15_tool69.part, mode=Mode.SUBTRACT)

    # F16 (radius 1.5 in the source; OpenCascade refuses exactly that, so slightly less here)
    f16_edges = [f1_11.edges().sort_by_distance(p)[0] for p in [
        (-12.5, 0, 0),
        (12.5, 0, 1.5),
        (-12.5, 0, 3),
    ]]
    fillet(f16_edges, radius=F16_R)

    # F17
    f17_edges = [f1_11.edges().sort_by_distance(p)[0] for p in [
        (-19, -38.25, -42),
        (-19, -29.149017, 3),
        (-20.274017, -21.5, 3),
        (-23, -21.5, -42),
        (-19, -23, -42),
        (-23.62132, -21.5, 2.12132),
        (-24.5, -21.5, -20.975983),
        (-19, -39.75, -20.975983),
        (-19, -38.87132, 2.12132),
        (-8.5, 23, -42),
        (8.5, 23, -42),
        (-8.5, 23, -29),
        (8.5, 23, -29),
    ]]
    fillet(f17_edges, radius=F17_R)

    # F18
    f18_edges = [f1_11.edges().sort_by_distance(p)[0] for p in [
        (5.475, -43.675, 3),
        (6.8, -39.574017, 3),
        (12.8, -39.574017, 3),
        (14.125, -43.675, 3),
        (9.8, -45, 3),
        (-12.8, -39.574017, 3),
        (-14.125, -43.675, 3),
        (-9.8, -45, 3),
        (-5.475, -43.675, 3),
        (-6.8, -39.574017, 3),
    ]]
    fillet(f18_edges, radius=F18_R)


solid = f1_11.part
